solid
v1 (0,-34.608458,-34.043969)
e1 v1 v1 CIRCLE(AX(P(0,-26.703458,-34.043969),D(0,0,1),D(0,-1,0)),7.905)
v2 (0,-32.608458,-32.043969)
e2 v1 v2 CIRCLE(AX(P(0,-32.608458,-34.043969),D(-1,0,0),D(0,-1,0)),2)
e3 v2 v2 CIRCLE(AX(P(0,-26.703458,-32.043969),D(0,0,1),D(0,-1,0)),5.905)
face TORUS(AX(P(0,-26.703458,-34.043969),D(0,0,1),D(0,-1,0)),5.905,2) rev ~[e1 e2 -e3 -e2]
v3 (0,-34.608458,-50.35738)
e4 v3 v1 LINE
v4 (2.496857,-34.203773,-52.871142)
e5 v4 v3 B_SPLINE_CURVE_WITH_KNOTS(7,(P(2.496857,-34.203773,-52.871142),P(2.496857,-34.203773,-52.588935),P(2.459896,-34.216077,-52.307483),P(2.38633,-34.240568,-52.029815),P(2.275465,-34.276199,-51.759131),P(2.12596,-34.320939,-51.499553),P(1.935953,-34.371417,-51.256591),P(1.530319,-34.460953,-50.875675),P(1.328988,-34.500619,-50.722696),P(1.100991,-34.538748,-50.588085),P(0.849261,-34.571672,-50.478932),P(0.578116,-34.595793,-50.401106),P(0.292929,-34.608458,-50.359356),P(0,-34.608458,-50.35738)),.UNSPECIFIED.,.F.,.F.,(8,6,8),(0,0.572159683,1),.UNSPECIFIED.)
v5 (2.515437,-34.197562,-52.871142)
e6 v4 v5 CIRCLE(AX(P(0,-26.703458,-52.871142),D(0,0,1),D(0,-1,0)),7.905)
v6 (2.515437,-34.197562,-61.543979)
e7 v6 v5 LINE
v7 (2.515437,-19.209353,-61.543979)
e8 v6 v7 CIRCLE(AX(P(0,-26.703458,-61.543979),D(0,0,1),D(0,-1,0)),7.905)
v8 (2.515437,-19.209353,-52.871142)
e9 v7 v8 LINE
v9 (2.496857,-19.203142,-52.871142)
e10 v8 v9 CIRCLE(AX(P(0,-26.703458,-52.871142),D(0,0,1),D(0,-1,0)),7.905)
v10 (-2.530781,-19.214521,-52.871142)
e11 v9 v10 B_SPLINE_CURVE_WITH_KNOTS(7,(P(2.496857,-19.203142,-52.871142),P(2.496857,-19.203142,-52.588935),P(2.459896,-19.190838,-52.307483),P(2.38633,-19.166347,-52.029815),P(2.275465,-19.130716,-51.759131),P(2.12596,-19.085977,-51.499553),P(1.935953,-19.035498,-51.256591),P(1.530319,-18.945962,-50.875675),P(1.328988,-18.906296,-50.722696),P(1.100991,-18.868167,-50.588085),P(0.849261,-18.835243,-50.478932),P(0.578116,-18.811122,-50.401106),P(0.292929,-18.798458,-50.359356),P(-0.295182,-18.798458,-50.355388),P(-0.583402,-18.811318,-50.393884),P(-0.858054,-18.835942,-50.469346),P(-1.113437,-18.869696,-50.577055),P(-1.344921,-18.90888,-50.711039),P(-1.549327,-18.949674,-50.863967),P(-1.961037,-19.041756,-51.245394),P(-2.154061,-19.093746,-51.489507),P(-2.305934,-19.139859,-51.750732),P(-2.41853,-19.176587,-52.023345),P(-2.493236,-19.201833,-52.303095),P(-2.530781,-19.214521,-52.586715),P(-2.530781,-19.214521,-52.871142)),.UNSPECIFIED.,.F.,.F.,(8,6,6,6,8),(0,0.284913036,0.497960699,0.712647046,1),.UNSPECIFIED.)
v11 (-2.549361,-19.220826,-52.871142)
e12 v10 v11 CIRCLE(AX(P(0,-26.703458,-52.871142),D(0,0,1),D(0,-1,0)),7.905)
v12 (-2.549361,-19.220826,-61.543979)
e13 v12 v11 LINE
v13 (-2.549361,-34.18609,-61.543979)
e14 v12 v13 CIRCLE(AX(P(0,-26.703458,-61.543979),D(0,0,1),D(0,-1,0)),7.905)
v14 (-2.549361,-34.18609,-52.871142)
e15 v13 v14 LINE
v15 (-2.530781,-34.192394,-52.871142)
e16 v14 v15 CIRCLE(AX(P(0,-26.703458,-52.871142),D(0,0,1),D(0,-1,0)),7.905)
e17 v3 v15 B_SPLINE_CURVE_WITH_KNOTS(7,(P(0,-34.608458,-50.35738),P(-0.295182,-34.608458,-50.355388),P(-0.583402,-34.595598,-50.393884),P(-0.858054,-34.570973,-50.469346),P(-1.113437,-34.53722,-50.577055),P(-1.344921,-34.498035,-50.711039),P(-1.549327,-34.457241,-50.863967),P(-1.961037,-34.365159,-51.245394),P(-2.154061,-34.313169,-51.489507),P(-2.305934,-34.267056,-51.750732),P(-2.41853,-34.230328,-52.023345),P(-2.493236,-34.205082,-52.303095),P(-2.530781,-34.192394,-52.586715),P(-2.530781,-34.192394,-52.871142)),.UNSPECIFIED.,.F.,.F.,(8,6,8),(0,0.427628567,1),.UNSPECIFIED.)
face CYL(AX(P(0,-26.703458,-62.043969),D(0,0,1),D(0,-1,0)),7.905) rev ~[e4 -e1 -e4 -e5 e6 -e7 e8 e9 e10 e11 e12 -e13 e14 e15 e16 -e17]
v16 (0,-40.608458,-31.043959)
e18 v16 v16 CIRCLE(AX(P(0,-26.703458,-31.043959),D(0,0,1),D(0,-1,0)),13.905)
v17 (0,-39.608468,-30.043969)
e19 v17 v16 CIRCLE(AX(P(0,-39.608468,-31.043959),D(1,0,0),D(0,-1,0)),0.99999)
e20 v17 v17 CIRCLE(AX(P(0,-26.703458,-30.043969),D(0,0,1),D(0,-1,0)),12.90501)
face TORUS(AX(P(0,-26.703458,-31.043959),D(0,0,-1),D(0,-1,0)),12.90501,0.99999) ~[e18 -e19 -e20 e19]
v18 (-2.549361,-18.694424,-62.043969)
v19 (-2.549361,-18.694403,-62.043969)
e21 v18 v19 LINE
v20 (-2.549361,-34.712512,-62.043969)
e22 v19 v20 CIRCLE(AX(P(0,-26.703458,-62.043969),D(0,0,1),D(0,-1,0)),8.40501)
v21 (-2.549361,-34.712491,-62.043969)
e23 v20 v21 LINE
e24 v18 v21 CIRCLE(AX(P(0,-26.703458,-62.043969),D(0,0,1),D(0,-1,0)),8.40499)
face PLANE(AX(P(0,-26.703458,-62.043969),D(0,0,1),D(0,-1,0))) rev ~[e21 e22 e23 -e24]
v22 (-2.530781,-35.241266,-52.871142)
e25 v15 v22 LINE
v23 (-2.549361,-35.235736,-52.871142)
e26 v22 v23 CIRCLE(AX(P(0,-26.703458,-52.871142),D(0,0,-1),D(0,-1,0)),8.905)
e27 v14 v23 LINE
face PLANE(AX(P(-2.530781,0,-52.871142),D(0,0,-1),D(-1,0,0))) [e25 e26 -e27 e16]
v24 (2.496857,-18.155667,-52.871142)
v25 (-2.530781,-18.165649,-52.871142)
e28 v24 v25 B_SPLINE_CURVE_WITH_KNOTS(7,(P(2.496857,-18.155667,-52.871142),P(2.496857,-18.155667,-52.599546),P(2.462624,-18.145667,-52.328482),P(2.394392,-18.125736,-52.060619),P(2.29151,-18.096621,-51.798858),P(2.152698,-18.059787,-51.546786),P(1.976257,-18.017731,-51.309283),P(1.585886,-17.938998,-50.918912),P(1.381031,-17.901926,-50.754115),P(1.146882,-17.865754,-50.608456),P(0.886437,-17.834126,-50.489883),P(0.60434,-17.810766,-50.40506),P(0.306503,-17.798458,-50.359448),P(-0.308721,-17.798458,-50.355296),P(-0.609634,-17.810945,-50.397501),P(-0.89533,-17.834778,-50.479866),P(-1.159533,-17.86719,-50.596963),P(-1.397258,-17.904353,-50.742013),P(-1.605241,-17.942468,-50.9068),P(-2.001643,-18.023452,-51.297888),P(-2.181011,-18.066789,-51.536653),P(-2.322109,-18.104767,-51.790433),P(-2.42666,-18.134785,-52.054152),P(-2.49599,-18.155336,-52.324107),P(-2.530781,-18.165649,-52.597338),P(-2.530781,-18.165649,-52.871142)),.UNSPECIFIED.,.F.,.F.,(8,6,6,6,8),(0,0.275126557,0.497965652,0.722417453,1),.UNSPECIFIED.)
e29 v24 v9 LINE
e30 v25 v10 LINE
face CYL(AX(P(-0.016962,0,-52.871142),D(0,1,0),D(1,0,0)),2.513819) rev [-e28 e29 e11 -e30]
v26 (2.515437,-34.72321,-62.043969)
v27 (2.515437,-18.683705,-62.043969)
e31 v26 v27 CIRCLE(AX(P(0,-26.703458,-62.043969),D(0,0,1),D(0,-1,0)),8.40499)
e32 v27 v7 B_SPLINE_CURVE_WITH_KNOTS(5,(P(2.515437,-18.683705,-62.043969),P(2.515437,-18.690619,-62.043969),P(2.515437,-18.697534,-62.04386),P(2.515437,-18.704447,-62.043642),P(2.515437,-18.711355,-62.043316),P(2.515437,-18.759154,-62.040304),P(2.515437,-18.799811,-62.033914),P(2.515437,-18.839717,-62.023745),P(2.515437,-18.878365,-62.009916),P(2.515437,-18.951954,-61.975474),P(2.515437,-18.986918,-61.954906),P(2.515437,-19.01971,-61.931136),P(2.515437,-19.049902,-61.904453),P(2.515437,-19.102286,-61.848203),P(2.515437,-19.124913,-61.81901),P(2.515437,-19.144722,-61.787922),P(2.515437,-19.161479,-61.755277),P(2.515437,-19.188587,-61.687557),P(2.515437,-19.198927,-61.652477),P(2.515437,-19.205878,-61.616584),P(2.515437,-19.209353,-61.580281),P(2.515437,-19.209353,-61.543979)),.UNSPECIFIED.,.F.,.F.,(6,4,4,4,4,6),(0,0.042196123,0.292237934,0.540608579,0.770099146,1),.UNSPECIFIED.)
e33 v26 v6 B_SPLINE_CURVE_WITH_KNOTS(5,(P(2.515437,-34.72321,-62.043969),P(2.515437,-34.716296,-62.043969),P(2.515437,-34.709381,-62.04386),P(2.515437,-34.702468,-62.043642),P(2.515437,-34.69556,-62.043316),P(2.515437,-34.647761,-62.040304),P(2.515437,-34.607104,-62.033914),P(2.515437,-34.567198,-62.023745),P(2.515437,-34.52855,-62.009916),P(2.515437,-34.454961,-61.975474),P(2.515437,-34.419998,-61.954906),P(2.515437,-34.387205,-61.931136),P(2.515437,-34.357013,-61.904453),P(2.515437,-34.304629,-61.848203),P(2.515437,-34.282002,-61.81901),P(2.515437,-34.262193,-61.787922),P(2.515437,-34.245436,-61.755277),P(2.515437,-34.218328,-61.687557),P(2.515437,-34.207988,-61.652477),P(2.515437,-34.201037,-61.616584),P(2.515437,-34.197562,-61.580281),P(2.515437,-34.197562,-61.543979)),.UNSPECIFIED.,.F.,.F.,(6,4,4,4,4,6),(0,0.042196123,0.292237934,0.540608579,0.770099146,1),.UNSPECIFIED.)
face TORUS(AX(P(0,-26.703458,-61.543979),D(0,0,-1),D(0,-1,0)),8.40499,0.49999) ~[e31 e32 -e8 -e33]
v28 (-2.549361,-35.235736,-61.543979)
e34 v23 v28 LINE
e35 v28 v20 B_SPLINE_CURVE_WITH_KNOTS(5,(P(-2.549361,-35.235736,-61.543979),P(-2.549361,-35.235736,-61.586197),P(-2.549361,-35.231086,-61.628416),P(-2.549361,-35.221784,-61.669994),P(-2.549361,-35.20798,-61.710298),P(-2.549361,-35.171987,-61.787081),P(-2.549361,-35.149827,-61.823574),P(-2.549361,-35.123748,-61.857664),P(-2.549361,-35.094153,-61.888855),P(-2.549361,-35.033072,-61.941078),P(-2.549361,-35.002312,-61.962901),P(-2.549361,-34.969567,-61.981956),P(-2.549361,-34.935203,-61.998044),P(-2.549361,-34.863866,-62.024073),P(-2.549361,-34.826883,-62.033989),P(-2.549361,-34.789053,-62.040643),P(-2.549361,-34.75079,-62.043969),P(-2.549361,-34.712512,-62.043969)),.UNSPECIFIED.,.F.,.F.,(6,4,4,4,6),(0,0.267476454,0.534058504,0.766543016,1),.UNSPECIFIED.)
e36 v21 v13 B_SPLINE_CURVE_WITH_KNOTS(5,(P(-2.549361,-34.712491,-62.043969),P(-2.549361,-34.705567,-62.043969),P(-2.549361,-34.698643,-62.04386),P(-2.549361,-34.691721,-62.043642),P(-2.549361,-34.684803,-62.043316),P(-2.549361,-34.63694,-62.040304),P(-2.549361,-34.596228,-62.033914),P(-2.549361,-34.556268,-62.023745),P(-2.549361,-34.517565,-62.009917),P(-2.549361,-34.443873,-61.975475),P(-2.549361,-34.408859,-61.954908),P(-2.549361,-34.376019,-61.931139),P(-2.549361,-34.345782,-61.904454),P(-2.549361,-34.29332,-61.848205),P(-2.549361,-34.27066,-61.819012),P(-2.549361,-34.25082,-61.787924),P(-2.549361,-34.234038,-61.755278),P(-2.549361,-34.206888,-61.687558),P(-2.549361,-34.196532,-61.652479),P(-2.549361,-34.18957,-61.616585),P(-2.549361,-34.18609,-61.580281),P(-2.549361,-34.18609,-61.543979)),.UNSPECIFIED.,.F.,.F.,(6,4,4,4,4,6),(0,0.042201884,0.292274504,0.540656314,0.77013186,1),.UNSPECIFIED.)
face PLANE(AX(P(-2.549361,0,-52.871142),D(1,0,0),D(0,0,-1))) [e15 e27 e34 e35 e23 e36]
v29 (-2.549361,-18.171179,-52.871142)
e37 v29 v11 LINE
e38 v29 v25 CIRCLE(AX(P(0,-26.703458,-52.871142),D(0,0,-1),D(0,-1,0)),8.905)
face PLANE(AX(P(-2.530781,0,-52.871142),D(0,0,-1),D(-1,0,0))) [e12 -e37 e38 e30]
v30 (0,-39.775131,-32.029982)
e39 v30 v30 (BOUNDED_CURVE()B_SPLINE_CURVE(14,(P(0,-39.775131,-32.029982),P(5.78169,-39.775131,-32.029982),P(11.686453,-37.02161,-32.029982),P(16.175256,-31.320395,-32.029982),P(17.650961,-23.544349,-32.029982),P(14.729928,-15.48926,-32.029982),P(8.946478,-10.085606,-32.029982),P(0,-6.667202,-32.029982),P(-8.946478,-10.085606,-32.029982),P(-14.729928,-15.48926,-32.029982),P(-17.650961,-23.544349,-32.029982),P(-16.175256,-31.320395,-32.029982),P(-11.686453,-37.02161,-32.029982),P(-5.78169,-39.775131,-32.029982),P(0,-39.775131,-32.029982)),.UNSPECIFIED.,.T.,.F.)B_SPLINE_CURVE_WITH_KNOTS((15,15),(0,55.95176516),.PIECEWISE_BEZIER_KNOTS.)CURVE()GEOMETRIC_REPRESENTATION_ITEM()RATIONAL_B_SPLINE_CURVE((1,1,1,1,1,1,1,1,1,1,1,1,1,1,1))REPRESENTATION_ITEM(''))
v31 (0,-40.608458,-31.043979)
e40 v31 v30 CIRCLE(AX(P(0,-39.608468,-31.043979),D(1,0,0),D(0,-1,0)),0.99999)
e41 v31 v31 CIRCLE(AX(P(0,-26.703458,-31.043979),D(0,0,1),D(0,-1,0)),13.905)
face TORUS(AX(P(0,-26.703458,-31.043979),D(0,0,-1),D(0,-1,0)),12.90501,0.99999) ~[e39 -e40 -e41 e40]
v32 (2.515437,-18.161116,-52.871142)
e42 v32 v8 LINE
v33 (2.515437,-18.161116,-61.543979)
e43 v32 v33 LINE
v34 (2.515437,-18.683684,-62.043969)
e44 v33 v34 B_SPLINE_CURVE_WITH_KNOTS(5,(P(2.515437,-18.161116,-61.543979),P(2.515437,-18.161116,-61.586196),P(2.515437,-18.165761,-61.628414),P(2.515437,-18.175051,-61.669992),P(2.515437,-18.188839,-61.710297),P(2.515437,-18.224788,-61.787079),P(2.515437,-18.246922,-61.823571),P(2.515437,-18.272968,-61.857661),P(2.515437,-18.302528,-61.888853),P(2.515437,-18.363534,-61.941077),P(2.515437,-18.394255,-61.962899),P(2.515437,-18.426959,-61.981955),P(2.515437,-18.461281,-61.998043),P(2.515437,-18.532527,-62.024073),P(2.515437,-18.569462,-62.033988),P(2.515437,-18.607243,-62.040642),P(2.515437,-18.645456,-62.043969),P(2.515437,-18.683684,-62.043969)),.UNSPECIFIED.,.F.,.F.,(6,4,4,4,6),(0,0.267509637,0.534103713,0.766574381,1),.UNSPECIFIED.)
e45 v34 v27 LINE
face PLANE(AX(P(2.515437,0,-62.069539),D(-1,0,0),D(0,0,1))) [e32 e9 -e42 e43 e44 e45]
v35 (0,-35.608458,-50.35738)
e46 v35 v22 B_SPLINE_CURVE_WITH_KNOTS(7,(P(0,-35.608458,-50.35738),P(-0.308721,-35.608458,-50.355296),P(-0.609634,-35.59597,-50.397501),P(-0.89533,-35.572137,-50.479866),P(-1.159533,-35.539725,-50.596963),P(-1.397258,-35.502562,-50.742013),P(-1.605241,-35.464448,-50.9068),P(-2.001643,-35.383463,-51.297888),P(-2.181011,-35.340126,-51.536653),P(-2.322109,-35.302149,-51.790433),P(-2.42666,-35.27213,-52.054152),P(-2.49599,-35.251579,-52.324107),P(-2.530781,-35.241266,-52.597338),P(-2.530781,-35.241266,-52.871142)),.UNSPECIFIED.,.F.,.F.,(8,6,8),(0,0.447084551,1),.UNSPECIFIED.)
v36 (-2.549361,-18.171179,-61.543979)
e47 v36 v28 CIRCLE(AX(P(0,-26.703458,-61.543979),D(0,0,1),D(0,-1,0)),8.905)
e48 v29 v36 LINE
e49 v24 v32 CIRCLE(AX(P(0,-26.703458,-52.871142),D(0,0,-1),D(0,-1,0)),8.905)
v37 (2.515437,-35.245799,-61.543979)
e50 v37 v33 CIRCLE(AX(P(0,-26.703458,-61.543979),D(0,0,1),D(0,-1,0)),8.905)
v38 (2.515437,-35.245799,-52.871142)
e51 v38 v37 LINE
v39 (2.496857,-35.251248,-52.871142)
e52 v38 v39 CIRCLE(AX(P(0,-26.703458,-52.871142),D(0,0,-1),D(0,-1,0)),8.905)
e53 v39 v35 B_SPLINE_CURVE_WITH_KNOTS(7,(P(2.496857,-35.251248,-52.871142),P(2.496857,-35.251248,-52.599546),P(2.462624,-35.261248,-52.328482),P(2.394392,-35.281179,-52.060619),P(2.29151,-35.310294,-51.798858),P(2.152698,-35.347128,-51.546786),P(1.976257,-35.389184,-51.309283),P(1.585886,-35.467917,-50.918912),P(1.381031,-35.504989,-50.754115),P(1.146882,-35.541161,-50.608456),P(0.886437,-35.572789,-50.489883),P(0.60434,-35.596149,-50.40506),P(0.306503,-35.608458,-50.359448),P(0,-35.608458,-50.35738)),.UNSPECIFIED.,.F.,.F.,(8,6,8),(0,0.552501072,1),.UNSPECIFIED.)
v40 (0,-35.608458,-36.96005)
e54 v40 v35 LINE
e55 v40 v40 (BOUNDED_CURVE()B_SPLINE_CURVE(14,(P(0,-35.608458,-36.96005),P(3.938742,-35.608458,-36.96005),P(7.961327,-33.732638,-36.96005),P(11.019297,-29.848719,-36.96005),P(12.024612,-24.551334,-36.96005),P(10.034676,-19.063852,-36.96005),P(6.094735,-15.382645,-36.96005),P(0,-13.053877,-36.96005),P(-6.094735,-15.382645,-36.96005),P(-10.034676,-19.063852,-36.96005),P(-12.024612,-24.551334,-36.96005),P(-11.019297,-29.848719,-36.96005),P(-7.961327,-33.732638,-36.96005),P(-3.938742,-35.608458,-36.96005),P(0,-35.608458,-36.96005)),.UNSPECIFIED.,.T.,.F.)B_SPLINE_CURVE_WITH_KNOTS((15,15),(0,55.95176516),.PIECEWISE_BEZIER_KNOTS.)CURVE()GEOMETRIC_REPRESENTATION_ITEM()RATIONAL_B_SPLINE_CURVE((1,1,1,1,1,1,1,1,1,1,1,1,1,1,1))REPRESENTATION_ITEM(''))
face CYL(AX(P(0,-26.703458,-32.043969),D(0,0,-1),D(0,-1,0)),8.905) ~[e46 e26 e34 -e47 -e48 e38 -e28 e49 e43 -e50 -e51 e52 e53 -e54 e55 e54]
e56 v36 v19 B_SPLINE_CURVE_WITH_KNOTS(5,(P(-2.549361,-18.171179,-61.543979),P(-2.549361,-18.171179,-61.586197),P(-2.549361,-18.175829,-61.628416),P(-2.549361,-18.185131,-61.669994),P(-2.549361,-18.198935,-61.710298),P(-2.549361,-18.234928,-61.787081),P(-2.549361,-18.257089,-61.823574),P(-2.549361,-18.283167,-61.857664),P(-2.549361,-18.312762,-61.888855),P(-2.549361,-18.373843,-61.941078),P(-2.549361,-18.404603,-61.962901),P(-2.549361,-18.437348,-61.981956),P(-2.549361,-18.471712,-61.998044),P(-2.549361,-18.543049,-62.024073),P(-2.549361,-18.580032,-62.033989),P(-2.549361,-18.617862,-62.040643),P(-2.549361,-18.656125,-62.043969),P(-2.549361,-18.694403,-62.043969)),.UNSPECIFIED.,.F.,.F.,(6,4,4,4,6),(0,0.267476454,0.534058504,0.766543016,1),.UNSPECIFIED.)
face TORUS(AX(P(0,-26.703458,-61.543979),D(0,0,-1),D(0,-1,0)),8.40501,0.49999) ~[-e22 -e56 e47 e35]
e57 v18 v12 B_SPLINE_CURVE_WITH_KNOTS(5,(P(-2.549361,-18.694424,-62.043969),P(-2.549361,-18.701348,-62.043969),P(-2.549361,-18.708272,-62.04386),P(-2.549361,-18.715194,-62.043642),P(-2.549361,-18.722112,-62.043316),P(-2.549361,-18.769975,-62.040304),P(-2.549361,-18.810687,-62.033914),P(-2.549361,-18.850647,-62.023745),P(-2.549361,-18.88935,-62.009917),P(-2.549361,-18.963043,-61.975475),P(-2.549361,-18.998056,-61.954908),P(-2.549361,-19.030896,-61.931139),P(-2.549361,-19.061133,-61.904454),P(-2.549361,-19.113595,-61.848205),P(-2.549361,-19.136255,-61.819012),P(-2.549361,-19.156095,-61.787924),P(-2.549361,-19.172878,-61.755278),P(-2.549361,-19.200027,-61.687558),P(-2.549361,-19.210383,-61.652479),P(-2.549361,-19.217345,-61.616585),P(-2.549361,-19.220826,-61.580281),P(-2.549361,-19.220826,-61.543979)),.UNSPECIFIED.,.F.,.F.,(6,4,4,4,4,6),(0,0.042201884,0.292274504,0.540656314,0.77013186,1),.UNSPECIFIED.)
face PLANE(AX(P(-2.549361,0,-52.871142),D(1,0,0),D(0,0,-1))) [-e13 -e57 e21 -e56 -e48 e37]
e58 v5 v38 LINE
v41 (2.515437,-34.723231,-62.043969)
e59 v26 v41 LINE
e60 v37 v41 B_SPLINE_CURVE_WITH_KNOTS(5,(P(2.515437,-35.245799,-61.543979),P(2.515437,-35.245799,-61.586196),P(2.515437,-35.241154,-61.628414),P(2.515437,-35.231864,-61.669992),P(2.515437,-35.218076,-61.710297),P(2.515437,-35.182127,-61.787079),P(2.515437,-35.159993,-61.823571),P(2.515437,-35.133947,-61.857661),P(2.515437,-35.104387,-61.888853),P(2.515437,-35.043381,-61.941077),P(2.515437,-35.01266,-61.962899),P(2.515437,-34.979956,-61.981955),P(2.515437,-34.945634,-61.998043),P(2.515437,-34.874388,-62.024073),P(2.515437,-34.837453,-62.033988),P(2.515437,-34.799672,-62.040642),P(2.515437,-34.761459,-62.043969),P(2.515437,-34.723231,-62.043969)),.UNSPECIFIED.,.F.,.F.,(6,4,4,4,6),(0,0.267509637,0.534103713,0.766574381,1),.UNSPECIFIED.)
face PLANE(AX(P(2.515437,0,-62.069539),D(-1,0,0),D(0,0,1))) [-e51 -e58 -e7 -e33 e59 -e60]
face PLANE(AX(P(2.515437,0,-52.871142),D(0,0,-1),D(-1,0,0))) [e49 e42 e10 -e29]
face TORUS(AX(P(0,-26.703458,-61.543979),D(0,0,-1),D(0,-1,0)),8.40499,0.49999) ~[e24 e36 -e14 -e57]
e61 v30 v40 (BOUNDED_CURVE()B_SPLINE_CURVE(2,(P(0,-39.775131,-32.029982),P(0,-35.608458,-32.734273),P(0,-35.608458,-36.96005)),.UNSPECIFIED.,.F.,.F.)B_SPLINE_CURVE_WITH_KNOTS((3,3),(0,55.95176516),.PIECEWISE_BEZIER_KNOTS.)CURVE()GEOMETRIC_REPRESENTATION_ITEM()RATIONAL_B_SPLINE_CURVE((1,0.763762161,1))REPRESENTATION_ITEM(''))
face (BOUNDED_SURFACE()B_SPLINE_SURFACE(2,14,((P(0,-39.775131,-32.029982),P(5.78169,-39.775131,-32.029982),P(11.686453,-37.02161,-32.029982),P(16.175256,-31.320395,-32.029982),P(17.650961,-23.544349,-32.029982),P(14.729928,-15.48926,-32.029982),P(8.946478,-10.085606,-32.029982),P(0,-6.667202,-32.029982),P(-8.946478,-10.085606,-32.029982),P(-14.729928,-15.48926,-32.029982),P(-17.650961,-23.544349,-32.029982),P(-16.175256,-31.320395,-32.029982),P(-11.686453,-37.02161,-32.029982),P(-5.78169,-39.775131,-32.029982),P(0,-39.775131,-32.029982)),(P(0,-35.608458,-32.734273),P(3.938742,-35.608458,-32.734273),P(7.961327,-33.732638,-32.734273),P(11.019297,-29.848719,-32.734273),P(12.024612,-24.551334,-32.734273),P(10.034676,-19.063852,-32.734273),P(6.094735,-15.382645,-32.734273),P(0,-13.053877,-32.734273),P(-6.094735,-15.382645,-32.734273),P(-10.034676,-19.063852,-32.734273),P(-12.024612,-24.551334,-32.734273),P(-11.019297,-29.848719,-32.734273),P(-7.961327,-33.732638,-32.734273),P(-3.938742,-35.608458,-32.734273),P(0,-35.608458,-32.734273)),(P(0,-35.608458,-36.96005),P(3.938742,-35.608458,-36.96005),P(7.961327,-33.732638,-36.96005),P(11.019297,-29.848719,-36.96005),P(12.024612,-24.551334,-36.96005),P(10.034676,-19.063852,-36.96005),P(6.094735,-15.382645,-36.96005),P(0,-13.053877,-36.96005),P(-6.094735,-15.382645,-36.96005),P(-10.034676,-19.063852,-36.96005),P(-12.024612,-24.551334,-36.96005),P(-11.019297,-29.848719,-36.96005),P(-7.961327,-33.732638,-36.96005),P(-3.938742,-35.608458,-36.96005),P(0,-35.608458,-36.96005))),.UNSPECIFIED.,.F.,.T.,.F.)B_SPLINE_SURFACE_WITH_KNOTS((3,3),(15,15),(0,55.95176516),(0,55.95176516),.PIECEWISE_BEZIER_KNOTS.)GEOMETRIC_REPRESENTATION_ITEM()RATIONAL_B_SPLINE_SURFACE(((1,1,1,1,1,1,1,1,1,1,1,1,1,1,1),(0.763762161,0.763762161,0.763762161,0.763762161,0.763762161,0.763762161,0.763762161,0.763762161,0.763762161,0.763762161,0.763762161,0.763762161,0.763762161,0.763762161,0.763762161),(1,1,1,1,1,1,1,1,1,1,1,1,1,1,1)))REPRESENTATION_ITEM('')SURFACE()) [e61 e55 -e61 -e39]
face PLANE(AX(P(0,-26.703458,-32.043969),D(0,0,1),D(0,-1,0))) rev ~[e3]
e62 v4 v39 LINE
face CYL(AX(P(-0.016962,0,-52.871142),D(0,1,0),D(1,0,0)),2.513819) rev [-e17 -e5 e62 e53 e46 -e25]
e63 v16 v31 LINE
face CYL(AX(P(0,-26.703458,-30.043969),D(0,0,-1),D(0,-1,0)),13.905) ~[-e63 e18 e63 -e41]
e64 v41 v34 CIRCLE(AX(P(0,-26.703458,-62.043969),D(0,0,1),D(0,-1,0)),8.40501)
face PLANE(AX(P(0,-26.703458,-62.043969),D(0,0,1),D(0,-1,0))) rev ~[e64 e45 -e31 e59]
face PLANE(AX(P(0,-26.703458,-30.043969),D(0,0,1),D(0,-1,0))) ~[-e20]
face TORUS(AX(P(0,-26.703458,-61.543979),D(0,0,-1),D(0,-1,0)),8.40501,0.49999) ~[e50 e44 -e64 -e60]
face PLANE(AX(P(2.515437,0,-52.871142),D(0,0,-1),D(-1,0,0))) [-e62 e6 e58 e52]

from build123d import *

# Parameters (mm, degrees)
F2_R     = 0.99999
F3_R     = 5
F4_R     = 0.49999
F5_R     = 2.4176485657
F6_DEPTH = 89.5
F7_R     = 2
F9_DEPTH = 39.1


# Not quite as in the source:
# - a fillet or chamfer is up to 0.001 mm smaller than in the source, because OpenCascade refuses the exact size


with BuildPart() as f1:
    # F0 (on Right) → F1 (revolve)
    with BuildSketch(Plane.YZ):
        Polygon((-35.6084575608, -62.0439687319), (-34.6084575608, -62.0439687319), (-34.6084575608, -32.0439687319), (-26.7034575608, -32.0439687319), (-26.7034575608, -30.0439687319), (-40.6084575608, -30.0439687319), (-40.6084575608, -32.0439687319), (-35.6084575608, -32.0439687319), align=None)
    revolve(axis=Axis((0, -26.7034575608, -31.0439687319), (0, 0, 1)))

    # F2 (radius 1 in the source; OpenCascade refuses exactly that, so slightly less here)
    f2_edges = [f1.edges().sort_by_distance(p)[0] for p in [
        (0, -12.798458, -32.043969),
        (0, -12.798458, -30.043969),
    ]]
    fillet(f2_edges, radius=F2_R)

    # F3
    f3_edges = [f1.edges().sort_by_distance(p)[0] for p in [
        (0, -17.798458, -32.043969),
    ]]
    fillet(f3_edges, radius=F3_R)

    # F4 (radius 0.5 in the source; OpenCascade refuses exactly that, so slightly less here)
    f4_edges = [f1.edges().sort_by_distance(p)[0] for p in [
        (0, -18.798458, -62.043969),
        (0, -17.798458, -62.043969),
    ]]
    fillet(f4_edges, radius=F4_R)

    # F5 (on Front) → F6 (cut)
    with BuildSketch(Plane.XZ):
        with Locations((0, -61.6349689662)):
            Circle(F5_R)
    extrude(amount=F6_DEPTH, mode=Mode.SUBTRACT)

    # F7
    f7_edges = [f1.edges().sort_by_distance(p)[0] for p in [
        (0, -18.798458, -32.043969),
    ]]
    fillet(f7_edges, radius=F7_R)

    # F8 (on Front) → F9 (cut)
    with BuildSketch(Plane.XZ):
        with BuildLine():
            Line((-2.5493614376, -52.8711415827), (-2.5493614376, -62.0828643441))
            Line((-2.5493614376, -62.0828643441), (2.5154370815, -62.0695389807))
            Line((2.5154370815, -62.0695389807), (2.5154370815, -52.8711415827))
            Line((2.5154370815, -52.8711415827), (2.4968570896, -52.8711415827))
            ThreePointArc((2.4968570896, -52.8711415827), (-0.0169621781, -55.3849608503), (-2.5307814457, -52.8711415827))
            Line((-2.5307814457, -52.8711415827), (-2.5493614376, -52.8711415827))
        make_face()
        with BuildLine():
            ThreePointArc((2.4968570896, -52.8711415827), (-0.0169621781, -50.3573223151), (-2.5307814457, -52.8711415827))
            Line((-2.5307814457, -52.8711415827), (2.4968570896, -52.8711415827))
        make_face()
        with BuildLine():
            Line((2.4968570896, -52.8711415827), (-2.5307814457, -52.8711415827))
            ThreePointArc((-2.5307814457, -52.8711415827), (-0.0169621781, -55.3849608503), (2.4968570896, -52.8711415827))
        make_face()
    extrude(amount=F9_DEPTH, mode=Mode.SUBTRACT)


solid = f1.part
